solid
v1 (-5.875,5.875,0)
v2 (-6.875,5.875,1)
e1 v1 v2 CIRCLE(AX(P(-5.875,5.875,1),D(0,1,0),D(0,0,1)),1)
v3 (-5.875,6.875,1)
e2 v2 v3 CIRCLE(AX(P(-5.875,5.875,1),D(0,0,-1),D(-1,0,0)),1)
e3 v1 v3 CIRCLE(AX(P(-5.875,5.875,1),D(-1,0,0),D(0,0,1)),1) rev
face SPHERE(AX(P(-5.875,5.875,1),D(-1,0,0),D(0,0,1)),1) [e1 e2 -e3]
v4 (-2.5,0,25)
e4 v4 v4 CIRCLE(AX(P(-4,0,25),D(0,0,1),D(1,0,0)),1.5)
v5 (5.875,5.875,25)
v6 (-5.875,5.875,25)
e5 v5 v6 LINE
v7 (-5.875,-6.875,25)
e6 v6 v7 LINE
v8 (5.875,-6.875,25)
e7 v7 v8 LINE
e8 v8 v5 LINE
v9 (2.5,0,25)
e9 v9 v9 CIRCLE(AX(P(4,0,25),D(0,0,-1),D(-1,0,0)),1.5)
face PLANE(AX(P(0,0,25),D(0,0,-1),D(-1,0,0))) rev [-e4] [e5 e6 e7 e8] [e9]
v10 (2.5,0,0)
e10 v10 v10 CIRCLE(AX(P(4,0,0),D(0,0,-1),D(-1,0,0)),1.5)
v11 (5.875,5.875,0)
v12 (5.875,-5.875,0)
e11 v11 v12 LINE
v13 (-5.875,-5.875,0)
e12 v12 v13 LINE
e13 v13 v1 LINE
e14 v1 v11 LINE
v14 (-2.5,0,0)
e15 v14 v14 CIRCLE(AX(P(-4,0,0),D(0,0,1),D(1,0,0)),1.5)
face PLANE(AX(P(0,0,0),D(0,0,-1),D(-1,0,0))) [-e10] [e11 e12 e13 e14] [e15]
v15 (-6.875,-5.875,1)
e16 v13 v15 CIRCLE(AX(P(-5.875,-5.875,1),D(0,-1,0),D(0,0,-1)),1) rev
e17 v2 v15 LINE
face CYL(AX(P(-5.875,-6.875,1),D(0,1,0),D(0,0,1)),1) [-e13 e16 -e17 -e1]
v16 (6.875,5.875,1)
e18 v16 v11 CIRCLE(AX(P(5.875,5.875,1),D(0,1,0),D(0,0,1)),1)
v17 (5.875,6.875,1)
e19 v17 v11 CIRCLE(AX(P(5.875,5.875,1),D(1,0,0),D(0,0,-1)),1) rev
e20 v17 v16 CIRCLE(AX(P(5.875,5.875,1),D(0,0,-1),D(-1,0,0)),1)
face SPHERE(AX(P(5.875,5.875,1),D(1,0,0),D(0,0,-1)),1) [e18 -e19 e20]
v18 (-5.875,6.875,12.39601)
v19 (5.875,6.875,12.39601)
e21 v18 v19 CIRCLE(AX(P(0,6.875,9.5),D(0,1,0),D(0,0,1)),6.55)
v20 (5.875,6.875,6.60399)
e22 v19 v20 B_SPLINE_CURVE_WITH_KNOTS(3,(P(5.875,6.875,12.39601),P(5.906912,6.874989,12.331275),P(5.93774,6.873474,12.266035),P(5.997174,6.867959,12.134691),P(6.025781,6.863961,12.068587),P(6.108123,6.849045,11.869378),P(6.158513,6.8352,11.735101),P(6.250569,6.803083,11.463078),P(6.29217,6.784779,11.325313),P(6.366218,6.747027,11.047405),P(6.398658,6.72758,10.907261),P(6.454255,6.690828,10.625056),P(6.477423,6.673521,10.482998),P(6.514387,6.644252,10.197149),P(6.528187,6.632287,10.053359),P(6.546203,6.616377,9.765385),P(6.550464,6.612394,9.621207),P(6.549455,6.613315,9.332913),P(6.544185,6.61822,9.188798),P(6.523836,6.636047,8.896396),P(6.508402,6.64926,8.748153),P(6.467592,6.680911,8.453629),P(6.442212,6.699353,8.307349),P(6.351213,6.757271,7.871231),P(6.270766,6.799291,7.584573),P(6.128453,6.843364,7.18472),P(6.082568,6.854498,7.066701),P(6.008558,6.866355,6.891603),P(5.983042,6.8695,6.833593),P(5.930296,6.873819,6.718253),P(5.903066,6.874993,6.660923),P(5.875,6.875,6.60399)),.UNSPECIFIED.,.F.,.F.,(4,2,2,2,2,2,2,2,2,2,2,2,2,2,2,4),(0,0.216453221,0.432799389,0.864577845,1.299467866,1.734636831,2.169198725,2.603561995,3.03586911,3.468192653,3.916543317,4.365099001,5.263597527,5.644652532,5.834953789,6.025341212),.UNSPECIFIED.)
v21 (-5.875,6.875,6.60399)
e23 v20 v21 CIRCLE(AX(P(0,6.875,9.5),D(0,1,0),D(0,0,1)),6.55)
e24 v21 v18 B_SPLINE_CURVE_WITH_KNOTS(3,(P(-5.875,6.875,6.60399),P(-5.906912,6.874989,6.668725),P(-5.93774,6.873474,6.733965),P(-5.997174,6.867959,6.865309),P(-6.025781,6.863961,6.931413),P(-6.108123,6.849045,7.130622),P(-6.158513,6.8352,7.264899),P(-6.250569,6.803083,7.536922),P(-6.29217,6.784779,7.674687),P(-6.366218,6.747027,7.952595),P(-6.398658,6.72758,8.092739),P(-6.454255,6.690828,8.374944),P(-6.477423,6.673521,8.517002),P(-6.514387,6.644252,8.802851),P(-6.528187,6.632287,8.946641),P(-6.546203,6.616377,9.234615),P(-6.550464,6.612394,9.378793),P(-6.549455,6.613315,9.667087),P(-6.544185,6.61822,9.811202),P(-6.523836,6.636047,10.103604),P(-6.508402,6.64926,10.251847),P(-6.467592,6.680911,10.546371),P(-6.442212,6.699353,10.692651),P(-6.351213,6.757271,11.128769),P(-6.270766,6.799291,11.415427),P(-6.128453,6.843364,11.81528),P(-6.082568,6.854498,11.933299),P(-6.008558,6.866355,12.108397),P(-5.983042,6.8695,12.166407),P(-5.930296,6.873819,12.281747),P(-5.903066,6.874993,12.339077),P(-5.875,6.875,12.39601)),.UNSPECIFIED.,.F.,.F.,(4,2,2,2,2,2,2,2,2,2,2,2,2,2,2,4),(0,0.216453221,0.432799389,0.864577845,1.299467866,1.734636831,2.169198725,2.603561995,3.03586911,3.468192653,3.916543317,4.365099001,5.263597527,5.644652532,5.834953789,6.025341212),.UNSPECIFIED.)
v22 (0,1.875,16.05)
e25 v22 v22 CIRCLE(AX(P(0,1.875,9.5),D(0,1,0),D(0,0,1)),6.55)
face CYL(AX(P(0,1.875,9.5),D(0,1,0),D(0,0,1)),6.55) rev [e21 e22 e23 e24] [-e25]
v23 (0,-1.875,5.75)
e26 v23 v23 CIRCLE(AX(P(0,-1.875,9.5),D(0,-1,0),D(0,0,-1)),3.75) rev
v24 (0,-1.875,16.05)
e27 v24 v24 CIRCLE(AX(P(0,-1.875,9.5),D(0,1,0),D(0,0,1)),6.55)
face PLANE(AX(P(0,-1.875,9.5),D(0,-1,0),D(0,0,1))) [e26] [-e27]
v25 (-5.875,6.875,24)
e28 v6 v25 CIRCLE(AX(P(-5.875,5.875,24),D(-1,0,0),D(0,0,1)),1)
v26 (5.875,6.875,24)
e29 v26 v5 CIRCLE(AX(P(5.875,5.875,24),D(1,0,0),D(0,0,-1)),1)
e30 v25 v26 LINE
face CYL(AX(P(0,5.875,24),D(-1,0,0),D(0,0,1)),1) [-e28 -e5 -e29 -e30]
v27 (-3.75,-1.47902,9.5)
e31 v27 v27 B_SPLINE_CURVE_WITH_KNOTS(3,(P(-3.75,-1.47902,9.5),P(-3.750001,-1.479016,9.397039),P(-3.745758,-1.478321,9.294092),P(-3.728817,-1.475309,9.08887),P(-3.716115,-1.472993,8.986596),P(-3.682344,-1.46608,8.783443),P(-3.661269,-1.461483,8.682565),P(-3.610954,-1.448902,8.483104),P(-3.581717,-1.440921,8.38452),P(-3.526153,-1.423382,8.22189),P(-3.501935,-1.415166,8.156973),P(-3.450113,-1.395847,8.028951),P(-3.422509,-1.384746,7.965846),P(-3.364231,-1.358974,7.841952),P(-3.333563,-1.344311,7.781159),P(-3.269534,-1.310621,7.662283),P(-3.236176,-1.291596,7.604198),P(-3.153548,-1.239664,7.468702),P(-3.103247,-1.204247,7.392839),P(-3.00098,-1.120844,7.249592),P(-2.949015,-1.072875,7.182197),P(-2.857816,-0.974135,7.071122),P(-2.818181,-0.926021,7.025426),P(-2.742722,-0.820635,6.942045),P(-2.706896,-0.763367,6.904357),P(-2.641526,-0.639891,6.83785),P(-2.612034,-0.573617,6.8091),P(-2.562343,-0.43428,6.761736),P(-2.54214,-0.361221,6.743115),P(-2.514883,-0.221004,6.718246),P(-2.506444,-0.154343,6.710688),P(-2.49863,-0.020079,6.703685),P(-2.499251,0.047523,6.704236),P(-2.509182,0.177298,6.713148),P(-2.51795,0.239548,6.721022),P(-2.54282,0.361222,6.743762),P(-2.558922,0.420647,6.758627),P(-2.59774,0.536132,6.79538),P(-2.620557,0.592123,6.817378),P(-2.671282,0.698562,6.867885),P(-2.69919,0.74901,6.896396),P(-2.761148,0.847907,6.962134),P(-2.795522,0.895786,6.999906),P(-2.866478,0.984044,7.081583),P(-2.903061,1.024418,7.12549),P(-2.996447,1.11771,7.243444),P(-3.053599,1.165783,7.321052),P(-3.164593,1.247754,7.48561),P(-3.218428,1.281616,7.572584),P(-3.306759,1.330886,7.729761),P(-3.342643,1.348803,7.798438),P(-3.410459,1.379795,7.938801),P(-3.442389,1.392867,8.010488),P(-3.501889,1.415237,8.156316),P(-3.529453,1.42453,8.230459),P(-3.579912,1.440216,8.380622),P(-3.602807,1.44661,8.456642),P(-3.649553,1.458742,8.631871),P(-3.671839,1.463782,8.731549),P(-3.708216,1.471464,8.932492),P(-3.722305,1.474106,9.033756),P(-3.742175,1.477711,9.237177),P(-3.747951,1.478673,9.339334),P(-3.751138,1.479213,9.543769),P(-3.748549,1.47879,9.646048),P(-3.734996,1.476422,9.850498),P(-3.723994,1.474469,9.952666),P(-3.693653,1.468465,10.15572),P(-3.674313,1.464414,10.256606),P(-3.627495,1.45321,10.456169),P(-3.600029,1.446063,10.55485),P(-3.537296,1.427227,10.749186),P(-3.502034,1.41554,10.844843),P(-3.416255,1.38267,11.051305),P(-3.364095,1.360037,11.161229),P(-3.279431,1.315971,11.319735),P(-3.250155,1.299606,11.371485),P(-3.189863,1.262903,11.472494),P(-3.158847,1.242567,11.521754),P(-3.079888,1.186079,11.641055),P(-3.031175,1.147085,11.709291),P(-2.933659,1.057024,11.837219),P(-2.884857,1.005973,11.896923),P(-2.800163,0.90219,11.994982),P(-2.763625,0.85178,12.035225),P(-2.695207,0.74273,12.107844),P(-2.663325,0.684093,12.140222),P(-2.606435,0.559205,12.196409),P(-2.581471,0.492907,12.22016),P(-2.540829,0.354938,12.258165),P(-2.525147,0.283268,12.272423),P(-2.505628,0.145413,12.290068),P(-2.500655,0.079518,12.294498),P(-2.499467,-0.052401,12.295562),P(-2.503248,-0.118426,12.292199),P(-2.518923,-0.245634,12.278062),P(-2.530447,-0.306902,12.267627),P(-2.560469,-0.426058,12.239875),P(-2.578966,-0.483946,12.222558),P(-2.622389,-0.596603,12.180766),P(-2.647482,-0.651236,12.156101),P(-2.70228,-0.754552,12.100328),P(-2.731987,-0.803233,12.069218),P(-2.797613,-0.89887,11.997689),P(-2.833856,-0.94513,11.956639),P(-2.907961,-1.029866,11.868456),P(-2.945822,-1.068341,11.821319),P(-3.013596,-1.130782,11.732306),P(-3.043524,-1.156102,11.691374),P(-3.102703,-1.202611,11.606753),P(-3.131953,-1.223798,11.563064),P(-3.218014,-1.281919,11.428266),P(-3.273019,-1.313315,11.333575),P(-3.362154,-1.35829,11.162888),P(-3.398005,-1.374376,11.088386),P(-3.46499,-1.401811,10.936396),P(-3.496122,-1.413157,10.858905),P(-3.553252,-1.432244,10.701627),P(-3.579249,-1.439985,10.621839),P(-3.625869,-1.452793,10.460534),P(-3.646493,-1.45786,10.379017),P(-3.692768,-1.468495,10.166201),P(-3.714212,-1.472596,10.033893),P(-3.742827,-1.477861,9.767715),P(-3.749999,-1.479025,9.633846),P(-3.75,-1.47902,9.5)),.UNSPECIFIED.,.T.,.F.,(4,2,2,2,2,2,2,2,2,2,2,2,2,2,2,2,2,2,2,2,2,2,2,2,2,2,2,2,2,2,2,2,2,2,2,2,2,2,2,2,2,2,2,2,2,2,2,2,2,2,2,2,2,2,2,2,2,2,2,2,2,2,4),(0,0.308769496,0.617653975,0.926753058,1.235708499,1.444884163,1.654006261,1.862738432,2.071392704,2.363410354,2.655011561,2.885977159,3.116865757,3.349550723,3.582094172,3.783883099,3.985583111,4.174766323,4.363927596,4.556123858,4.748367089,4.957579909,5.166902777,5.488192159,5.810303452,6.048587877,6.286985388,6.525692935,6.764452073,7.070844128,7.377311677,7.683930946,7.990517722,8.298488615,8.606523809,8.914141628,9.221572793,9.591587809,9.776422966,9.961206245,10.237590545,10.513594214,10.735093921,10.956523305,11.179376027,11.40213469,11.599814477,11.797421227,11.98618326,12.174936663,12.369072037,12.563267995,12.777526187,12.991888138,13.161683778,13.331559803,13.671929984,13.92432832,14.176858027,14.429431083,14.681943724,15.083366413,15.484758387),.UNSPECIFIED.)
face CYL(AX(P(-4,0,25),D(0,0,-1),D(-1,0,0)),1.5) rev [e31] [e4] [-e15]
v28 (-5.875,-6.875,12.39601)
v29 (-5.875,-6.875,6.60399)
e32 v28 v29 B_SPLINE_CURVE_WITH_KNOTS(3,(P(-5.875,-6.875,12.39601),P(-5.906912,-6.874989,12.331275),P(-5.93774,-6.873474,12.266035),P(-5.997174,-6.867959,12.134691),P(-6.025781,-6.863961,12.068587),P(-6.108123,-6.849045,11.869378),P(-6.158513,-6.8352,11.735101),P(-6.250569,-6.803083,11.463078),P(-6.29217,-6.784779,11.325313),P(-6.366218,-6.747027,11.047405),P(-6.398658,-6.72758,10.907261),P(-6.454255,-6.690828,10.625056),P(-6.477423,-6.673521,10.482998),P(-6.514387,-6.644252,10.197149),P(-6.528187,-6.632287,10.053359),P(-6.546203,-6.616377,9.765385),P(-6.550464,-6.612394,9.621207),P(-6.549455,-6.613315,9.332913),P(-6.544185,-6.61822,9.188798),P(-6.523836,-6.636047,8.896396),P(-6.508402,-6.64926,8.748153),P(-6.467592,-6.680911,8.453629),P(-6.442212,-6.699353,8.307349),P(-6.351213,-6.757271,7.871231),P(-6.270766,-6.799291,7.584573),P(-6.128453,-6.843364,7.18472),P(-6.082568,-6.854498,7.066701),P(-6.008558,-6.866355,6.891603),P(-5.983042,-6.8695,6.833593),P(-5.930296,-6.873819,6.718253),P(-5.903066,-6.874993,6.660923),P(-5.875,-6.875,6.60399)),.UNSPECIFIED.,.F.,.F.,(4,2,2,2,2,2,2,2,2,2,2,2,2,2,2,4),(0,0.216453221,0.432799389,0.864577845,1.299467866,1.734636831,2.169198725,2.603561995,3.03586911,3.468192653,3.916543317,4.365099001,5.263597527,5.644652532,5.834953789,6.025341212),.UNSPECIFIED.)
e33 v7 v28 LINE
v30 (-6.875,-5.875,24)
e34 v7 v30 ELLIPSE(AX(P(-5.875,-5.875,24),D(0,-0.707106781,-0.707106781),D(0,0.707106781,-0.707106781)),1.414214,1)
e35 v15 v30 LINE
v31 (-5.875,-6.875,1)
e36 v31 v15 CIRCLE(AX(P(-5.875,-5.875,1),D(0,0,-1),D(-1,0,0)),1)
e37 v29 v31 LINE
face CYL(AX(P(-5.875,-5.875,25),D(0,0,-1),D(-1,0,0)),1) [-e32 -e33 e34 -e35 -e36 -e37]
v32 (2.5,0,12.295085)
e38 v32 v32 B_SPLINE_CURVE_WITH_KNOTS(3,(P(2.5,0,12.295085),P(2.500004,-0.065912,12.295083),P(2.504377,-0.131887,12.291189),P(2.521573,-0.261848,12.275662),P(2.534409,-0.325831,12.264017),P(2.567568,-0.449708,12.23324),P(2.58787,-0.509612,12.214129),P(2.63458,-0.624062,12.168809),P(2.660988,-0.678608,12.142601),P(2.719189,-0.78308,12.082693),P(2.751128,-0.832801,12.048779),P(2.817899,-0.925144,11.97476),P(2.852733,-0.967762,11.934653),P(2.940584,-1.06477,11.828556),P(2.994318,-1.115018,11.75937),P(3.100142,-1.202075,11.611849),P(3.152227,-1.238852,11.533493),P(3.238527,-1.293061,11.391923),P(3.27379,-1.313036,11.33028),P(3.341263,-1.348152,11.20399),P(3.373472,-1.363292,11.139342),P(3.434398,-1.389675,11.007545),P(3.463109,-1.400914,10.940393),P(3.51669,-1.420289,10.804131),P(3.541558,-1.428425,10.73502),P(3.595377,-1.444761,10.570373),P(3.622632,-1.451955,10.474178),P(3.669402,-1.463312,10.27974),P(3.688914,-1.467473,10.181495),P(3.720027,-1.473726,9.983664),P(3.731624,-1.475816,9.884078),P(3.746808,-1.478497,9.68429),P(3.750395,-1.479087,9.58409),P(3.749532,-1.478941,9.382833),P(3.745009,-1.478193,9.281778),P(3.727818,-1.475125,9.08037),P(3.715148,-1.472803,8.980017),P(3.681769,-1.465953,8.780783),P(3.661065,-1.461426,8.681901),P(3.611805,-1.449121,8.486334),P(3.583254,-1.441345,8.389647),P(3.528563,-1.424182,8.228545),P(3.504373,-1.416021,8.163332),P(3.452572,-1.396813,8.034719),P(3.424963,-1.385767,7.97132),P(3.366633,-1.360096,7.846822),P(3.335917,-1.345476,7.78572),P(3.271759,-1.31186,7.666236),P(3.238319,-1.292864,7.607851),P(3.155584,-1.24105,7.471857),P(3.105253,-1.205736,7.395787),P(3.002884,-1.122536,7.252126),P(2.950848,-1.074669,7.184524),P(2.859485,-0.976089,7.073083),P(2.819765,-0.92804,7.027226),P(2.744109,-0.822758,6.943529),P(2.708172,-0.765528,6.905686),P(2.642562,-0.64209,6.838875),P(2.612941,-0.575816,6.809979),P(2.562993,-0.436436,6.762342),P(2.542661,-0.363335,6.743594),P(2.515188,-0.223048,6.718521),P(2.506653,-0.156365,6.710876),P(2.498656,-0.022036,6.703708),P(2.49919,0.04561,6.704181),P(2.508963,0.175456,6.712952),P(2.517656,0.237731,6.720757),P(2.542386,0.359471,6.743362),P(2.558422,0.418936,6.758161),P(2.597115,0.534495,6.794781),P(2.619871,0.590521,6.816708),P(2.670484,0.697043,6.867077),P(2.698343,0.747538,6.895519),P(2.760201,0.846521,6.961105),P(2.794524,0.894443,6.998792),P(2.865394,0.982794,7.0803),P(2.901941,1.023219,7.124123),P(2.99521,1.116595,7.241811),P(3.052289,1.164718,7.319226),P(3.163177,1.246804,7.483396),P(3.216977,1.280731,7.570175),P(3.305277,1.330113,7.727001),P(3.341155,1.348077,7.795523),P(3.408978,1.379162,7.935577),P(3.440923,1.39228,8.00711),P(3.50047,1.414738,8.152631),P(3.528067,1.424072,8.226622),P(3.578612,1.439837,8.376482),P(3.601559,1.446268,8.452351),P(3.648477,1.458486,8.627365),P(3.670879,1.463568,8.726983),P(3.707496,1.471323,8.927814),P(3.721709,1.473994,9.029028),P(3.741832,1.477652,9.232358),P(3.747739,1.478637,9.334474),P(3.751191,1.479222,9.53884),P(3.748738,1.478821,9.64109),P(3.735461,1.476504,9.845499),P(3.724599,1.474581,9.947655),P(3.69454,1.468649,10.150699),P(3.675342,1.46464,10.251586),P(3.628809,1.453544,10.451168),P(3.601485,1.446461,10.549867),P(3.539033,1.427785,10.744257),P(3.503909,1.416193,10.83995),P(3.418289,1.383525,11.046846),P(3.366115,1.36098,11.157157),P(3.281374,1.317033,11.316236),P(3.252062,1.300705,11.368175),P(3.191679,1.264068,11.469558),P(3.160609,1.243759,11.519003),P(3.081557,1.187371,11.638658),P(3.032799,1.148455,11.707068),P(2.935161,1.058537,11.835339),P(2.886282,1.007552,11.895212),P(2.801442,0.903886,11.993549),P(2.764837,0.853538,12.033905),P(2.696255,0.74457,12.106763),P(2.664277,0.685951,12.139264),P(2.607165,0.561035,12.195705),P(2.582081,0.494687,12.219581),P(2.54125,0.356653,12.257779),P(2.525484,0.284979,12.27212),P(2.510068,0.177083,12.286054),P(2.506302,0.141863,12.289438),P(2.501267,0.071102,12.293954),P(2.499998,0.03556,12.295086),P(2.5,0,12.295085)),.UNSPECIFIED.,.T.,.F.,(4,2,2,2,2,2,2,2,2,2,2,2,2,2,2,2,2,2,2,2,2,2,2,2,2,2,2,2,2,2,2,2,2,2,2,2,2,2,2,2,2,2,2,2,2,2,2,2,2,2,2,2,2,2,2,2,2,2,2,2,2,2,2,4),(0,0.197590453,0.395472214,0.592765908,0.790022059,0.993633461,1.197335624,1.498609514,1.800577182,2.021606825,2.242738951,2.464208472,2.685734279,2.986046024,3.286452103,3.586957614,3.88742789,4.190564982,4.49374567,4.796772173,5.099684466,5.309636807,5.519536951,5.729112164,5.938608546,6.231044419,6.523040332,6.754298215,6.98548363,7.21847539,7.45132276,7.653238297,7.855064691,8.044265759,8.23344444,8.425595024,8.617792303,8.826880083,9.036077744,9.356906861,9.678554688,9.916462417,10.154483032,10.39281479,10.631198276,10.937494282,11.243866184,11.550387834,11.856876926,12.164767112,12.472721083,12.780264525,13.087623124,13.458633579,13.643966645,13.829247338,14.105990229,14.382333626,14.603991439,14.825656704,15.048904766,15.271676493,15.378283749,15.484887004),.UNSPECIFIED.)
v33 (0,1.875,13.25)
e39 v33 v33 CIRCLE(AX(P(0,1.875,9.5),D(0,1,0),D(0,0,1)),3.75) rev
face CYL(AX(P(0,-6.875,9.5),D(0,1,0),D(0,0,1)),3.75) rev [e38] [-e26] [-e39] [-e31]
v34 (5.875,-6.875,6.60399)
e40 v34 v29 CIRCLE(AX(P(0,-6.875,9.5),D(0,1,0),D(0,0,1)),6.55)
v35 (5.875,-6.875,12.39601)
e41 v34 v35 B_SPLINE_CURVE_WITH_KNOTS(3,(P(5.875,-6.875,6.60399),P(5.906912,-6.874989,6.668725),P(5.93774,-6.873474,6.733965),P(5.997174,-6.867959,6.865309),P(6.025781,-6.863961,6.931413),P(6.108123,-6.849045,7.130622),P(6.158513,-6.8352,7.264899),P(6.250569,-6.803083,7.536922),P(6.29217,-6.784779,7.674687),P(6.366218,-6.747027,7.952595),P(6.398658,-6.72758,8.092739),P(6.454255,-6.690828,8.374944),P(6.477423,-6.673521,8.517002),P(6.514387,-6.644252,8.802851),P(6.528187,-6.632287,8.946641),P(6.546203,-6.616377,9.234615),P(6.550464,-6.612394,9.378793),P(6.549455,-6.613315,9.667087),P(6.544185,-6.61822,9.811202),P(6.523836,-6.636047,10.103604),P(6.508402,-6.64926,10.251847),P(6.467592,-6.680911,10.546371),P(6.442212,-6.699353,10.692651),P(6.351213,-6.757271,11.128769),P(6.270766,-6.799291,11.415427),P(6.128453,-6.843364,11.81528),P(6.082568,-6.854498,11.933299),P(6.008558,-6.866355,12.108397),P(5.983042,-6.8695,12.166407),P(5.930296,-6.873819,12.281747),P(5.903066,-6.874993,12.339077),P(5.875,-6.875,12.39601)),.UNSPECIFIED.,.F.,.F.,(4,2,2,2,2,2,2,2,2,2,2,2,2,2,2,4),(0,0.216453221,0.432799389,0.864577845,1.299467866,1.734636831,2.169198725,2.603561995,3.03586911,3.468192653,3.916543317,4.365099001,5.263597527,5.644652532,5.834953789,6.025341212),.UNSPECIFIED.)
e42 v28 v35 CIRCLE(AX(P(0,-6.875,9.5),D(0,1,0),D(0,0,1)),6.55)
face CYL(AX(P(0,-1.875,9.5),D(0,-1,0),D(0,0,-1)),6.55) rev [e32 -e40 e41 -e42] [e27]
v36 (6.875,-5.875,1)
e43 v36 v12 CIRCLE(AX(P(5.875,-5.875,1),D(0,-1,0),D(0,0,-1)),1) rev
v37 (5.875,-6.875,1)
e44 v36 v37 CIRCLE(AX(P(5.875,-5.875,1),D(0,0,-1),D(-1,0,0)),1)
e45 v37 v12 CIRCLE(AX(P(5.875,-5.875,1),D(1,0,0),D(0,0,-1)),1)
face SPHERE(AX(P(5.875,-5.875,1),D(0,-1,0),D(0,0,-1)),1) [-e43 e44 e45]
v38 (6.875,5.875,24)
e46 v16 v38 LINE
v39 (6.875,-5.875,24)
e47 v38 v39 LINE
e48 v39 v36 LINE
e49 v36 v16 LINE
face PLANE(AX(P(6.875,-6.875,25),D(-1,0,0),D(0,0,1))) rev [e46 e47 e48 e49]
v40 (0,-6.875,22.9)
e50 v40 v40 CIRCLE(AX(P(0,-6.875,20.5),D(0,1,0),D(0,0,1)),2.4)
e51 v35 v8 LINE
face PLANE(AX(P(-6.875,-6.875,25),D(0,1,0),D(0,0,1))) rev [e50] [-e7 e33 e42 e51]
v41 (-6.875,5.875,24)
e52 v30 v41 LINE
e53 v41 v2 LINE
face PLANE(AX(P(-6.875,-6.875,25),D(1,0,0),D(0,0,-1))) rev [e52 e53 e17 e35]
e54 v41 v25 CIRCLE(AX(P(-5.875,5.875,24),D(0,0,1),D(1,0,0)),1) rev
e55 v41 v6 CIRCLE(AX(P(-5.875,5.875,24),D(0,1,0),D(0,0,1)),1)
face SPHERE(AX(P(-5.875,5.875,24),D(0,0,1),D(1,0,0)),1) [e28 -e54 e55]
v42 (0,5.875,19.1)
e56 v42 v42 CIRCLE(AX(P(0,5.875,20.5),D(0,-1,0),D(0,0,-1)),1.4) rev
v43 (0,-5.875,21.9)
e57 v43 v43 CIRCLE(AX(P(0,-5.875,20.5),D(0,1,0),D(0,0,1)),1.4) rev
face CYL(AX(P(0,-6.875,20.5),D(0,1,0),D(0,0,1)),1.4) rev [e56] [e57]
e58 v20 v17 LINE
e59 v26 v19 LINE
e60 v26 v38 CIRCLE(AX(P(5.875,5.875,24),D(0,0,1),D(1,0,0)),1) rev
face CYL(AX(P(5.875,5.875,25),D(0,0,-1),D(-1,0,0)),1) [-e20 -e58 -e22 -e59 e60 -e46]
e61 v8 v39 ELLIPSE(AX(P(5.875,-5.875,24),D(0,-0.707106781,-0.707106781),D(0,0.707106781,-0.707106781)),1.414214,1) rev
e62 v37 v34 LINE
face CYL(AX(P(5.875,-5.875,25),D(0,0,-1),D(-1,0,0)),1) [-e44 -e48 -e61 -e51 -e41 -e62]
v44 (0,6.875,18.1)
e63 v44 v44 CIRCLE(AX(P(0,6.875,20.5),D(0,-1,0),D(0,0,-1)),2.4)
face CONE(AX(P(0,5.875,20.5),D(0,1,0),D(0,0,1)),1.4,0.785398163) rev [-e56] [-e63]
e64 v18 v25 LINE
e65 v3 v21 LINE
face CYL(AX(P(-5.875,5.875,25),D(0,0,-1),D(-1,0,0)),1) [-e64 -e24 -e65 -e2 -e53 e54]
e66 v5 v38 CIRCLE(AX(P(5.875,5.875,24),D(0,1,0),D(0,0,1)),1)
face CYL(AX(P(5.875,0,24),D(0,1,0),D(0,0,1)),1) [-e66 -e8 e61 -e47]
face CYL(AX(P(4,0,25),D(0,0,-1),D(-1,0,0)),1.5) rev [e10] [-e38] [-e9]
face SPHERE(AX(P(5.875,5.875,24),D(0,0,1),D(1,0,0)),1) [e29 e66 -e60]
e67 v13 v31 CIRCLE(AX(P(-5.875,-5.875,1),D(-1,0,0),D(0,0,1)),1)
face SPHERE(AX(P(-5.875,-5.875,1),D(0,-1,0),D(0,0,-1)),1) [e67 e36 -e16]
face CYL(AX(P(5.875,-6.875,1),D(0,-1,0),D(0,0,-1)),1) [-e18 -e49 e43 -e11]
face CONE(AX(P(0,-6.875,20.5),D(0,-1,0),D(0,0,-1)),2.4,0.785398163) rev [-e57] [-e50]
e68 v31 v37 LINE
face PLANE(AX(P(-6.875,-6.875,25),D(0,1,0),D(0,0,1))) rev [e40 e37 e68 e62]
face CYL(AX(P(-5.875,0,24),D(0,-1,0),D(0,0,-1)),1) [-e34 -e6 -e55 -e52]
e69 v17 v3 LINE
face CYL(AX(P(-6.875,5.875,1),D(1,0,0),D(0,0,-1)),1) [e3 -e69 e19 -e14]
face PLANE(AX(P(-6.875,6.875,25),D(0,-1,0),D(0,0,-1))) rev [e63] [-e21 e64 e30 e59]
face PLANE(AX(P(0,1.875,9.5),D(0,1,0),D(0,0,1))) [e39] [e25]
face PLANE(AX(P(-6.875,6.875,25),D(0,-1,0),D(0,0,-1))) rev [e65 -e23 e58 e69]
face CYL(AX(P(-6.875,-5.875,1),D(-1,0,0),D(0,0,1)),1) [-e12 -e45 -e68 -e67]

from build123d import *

# Parameters (mm, degrees)
SKETCH1_W           = 13.75
SKETCH1_H           = 13.75
BOSS_EXTRUDE1_DEPTH = 25
SKETCH3_R           = 3.75
CUT_EXTRUDE2_DEPTH  = 30.348392205
SKETCH4_R           = 6.55
CUT_EXTRUDE3_DEPTH  = 5
SKETCH8_R           = 1.4
CUT_EXTRUDE6_DEPTH  = 30.348392205
SKETCH9_R           = 1.5
CUT_EXTRUDE7_DEPTH  = 27.824079667
CHAMFER1_SIZE       = 1
FILLET2_R           = 1


with BuildPart() as part:
    # Sketch1 → Boss-Extrude1 (new body)
    with BuildSketch(Plane.XY):
        Rectangle(SKETCH1_W, SKETCH1_H)
    extrude(amount=BOSS_EXTRUDE1_DEPTH)

    # Sketch3 → Cut-Extrude2 (cut, through all)
    with BuildSketch(Plane(origin=(0, 6.875, 0), x_dir=(1, 0, 0), z_dir=(0, 1, 0))):
        with Locations(Location((0, -9.5, 0), (0, 0, 270))):
            Circle(SKETCH3_R)
    extrude(amount=-CUT_EXTRUDE2_DEPTH, mode=Mode.SUBTRACT)

    # Sketch4 → Cut-Extrude3 (cut)
    with BuildSketch(Plane(origin=(0, 6.875, 0), x_dir=(1, 0, 0), z_dir=(0, 1, 0))):
        with Locations(Location((0, -9.5, 0), (0, 0, 270))):
            Circle(SKETCH4_R)
    cut_extrude3 = extrude(amount=-CUT_EXTRUDE3_DEPTH, mode=Mode.SUBTRACT)

    # Mirror4: Cut-Extrude3 across plane
    add(cut_extrude3.mirror(Plane.ZX), mode=Mode.SUBTRACT)

    # Sketch8 → Cut-Extrude6 (cut, through all)
    with BuildSketch(Plane(origin=(0, 6.875, 0), x_dir=(1, 0, 0), z_dir=(0, 1, 0))):
        with Locations(Location((0, -20.5, 0), (0, 0, 270))):
            Circle(SKETCH8_R)
    extrude(amount=-CUT_EXTRUDE6_DEPTH, mode=Mode.SUBTRACT)

    # Sketch9 → Cut-Extrude7 (cut, through all)
    with BuildSketch(Plane(origin=(0, 0, 0), x_dir=(-1, 0, 0), z_dir=(0, 0, -1))):
        with Locations((-4, 0)):
            Circle(SKETCH9_R)
    cut_extrude7 = extrude(amount=-CUT_EXTRUDE7_DEPTH, mode=Mode.SUBTRACT)

    # Mirror5: Cut-Extrude7 across plane
    add(cut_extrude7.mirror(Plane(origin=(0, 0, 0), x_dir=(0, 0, 1), z_dir=(1, 0, 0))), mode=Mode.SUBTRACT)

    # Chamfer1
    chamfer1_edges = [part.edges().sort_by_distance(p)[0] for p in [
        (0, -6.875, 19.1),
        (0, 6.875, 19.1),
    ]]
    chamfer(chamfer1_edges, length=CHAMFER1_SIZE)

    # Fillet2
    # the kernel refuses this fillet: 1 mm, written as the material it takes off along each edge
    with BuildSketch(Plane(origin=(-5.875, 5.875, 24), x_dir=(-1, 0, 0), z_dir=(0, 1, 0))) as fillet2_piece_1_section:
        Polygon((0, 0), (FILLET2_R, 0), (FILLET2_R, FILLET2_R), (0, FILLET2_R), align=None)
    fillet2_piece_1 = extrude(amount=FILLET2_R, mode=Mode.PRIVATE)
    fillet2_piece_1 = fillet2_piece_1 - Plane(origin=(-5.875, 5.875, 24), x_dir=(0.7071067811865475, 0, -0.7071067811865475), z_dir=(0, 1, 0)) * Sphere(FILLET2_R, mode=Mode.PRIVATE)
    add(fillet2_piece_1, mode=Mode.SUBTRACT)
    with BuildSketch(Plane(origin=(5.875, 5.875, 24), x_dir=(0, 0, 1), z_dir=(0, 1, 0))) as fillet2_piece_2_section:
        Polygon((0, 0), (FILLET2_R, 0), (FILLET2_R, FILLET2_R), (0, FILLET2_R), align=None)
    fillet2_piece_2 = extrude(amount=FILLET2_R, mode=Mode.PRIVATE)
    fillet2_piece_2 = fillet2_piece_2 - Plane(origin=(5.875, 5.875, 24), x_dir=(-0.7071067811865475, 0, -0.7071067811865475), z_dir=(0, 1, 0)) * Sphere(FILLET2_R, mode=Mode.PRIVATE)
    add(fillet2_piece_2, mode=Mode.SUBTRACT)
    with BuildSketch(Plane(origin=(-5.875, -5.875, 1), x_dir=(-1, 0, 0), z_dir=(0, -1, 0))) as fillet2_piece_3_section:
        Polygon((0, 0), (FILLET2_R, 0), (FILLET2_R, FILLET2_R), (0, FILLET2_R), align=None)
    fillet2_piece_3 = extrude(amount=FILLET2_R, mode=Mode.PRIVATE)
    fillet2_piece_3 = fillet2_piece_3 - Plane(origin=(-5.875, -5.875, 1), x_dir=(0.7071067811865475, 0, 0.7071067811865475), z_dir=(0, -1, 0)) * Sphere(FILLET2_R, mode=Mode.PRIVATE)
    add(fillet2_piece_3, mode=Mode.SUBTRACT)
    with BuildSketch(Plane(origin=(5.875, -5.875, 1), x_dir=(0, 0, -1), z_dir=(0, -1, 0))) as fillet2_piece_4_section:
        Polygon((0, 0), (FILLET2_R, 0), (FILLET2_R, FILLET2_R), (0, FILLET2_R), align=None)
    fillet2_piece_4 = extrude(amount=FILLET2_R, mode=Mode.PRIVATE)
    fillet2_piece_4 = fillet2_piece_4 - Plane(origin=(5.875, -5.875, 1), x_dir=(-0.7071067811865475, 0, 0.7071067811865475), z_dir=(0, -1, 0)) * Sphere(FILLET2_R, mode=Mode.PRIVATE)
    add(fillet2_piece_4, mode=Mode.SUBTRACT)
    with BuildSketch(Plane(origin=(-5.875, 5.875, 1), x_dir=(-1, 0, 0), z_dir=(0, 1, 0))) as fillet2_piece_5_section:
        Polygon((0, 0), (FILLET2_R, 0), (FILLET2_R, -FILLET2_R), (0, -FILLET2_R), align=None)
    fillet2_piece_5 = extrude(amount=FILLET2_R, mode=Mode.PRIVATE)
    fillet2_piece_5 = fillet2_piece_5 - Plane(origin=(-5.875, 5.875, 1), x_dir=(0.7071067811865475, 0, 0.7071067811865475), z_dir=(0, 1, 0)) * Sphere(FILLET2_R, mode=Mode.PRIVATE)
    add(fillet2_piece_5, mode=Mode.SUBTRACT)
    with BuildSketch(Plane(origin=(5.875, 5.875, 1), x_dir=(0, 0, -1), z_dir=(0, 1, 0))) as fillet2_piece_6_section:
        Polygon((0, 0), (FILLET2_R, 0), (FILLET2_R, -FILLET2_R), (0, -FILLET2_R), align=None)
    fillet2_piece_6 = extrude(amount=FILLET2_R, mode=Mode.PRIVATE)
    fillet2_piece_6 = fillet2_piece_6 - Plane(origin=(5.875, 5.875, 1), x_dir=(-0.7071067811865475, 0, 0.7071067811865475), z_dir=(0, 1, 0)) * Sphere(FILLET2_R, mode=Mode.PRIVATE)
    add(fillet2_piece_6, mode=Mode.SUBTRACT)
    with BuildSketch(Plane(origin=(-6.875, 5.875, 25), x_dir=(0, 0, -1), z_dir=(0, -1, 0))) as fillet2_piece_7:
        with BuildLine():
            CenterArc((FILLET2_R, FILLET2_R), FILLET2_R, 180, 90)
            Line((0, FILLET2_R), (0, 0))
            Line((0, 0), (FILLET2_R, 0))
        make_face()
    extrude(amount=15.25, mode=Mode.SUBTRACT)
    with BuildSketch(Plane(origin=(6.875, -9.375, 25), x_dir=(-1, 0, 0), z_dir=(0, 1, 0))) as fillet2_piece_8:
        with BuildLine():
            CenterArc((FILLET2_R, -FILLET2_R), FILLET2_R, 90, 90)
            Line((0, -FILLET2_R), (0, 0))
            Line((0, 0), (FILLET2_R, 0))
        make_face()
    extrude(amount=15.25, mode=Mode.SUBTRACT)
    with BuildSketch(Plane(origin=(-5.875, -6.875, 0), x_dir=(0, 0, 1), z_dir=(1, 0, 0)), Plane(origin=(-6.875, 5.875, 0), x_dir=(0, 0, 1), z_dir=(0, -1, 0)), Plane(origin=(5.875, 6.875, 25), x_dir=(0, -1, 0), z_dir=(-1, 0, 0))) as fillet2_piece_9:
        with BuildLine():
            CenterArc((FILLET2_R, -FILLET2_R), FILLET2_R, 90, 90)
            Line((0, -FILLET2_R), (0, 0))
            Line((0, 0), (FILLET2_R, 0))
        make_face()
    extrude(amount=11.75, mode=Mode.SUBTRACT)
    with BuildSketch(Plane(origin=(5.875, 6.875, 0), x_dir=(0, -1, 0), z_dir=(-1, 0, 0)), Plane(origin=(6.875, -5.875, 0), x_dir=(-1, 0, 0), z_dir=(0, 1, 0))) as fillet2_piece_10:
        with BuildLine():
            CenterArc((FILLET2_R, FILLET2_R), FILLET2_R, 180, 90)
            Line((0, FILLET2_R), (0, 0))
            Line((0, 0), (FILLET2_R, 0))
        make_face()
    extrude(amount=11.75, mode=Mode.SUBTRACT)
    with BuildSketch(Plane(origin=(6.875, -6.875, 1), x_dir=(-1, 0, 0), z_dir=(0, 0, 1))) as fillet2_piece_11:
        with BuildLine():
            CenterArc((FILLET2_R, -FILLET2_R), FILLET2_R, 90, 90)
            Line((0, -FILLET2_R), (0, 0))
            Line((0, 0), (FILLET2_R, 0))
        make_face()
    extrude(amount=26.5, mode=Mode.SUBTRACT)
    with BuildSketch(Plane(origin=(-6.875, -6.875, 1), x_dir=(1, 0, 0), z_dir=(0, 0, 1))) as fillet2_piece_12:
        with BuildLine():
            CenterArc((FILLET2_R, FILLET2_R), FILLET2_R, 180, 90)
            Line((0, FILLET2_R), (0, 0))
            Line((0, 0), (FILLET2_R, 0))
        make_face()
    extrude(amount=26.5, mode=Mode.SUBTRACT)
    with BuildSketch(Plane(origin=(-6.875, 6.875, 1), x_dir=(0, -1, 0), z_dir=(0, 0, 1))) as fillet2_piece_13:
        with BuildLine():
            CenterArc((FILLET2_R, FILLET2_R), FILLET2_R, 180, 90)
            Line((0, FILLET2_R), (0, 0))
            Line((0, 0), (FILLET2_R, 0))
        make_face()
    extrude(amount=23, mode=Mode.SUBTRACT)
    with BuildSketch(Plane(origin=(6.875, 6.875, 1), x_dir=(0, -1, 0), z_dir=(0, 0, 1))) as fillet2_piece_14:
        with BuildLine():
            CenterArc((FILLET2_R, -FILLET2_R), FILLET2_R, 90, 90)
            Line((0, -FILLET2_R), (0, 0))
            Line((0, 0), (FILLET2_R, 0))
        make_face()
    extrude(amount=23, mode=Mode.SUBTRACT)


solid = part.part
